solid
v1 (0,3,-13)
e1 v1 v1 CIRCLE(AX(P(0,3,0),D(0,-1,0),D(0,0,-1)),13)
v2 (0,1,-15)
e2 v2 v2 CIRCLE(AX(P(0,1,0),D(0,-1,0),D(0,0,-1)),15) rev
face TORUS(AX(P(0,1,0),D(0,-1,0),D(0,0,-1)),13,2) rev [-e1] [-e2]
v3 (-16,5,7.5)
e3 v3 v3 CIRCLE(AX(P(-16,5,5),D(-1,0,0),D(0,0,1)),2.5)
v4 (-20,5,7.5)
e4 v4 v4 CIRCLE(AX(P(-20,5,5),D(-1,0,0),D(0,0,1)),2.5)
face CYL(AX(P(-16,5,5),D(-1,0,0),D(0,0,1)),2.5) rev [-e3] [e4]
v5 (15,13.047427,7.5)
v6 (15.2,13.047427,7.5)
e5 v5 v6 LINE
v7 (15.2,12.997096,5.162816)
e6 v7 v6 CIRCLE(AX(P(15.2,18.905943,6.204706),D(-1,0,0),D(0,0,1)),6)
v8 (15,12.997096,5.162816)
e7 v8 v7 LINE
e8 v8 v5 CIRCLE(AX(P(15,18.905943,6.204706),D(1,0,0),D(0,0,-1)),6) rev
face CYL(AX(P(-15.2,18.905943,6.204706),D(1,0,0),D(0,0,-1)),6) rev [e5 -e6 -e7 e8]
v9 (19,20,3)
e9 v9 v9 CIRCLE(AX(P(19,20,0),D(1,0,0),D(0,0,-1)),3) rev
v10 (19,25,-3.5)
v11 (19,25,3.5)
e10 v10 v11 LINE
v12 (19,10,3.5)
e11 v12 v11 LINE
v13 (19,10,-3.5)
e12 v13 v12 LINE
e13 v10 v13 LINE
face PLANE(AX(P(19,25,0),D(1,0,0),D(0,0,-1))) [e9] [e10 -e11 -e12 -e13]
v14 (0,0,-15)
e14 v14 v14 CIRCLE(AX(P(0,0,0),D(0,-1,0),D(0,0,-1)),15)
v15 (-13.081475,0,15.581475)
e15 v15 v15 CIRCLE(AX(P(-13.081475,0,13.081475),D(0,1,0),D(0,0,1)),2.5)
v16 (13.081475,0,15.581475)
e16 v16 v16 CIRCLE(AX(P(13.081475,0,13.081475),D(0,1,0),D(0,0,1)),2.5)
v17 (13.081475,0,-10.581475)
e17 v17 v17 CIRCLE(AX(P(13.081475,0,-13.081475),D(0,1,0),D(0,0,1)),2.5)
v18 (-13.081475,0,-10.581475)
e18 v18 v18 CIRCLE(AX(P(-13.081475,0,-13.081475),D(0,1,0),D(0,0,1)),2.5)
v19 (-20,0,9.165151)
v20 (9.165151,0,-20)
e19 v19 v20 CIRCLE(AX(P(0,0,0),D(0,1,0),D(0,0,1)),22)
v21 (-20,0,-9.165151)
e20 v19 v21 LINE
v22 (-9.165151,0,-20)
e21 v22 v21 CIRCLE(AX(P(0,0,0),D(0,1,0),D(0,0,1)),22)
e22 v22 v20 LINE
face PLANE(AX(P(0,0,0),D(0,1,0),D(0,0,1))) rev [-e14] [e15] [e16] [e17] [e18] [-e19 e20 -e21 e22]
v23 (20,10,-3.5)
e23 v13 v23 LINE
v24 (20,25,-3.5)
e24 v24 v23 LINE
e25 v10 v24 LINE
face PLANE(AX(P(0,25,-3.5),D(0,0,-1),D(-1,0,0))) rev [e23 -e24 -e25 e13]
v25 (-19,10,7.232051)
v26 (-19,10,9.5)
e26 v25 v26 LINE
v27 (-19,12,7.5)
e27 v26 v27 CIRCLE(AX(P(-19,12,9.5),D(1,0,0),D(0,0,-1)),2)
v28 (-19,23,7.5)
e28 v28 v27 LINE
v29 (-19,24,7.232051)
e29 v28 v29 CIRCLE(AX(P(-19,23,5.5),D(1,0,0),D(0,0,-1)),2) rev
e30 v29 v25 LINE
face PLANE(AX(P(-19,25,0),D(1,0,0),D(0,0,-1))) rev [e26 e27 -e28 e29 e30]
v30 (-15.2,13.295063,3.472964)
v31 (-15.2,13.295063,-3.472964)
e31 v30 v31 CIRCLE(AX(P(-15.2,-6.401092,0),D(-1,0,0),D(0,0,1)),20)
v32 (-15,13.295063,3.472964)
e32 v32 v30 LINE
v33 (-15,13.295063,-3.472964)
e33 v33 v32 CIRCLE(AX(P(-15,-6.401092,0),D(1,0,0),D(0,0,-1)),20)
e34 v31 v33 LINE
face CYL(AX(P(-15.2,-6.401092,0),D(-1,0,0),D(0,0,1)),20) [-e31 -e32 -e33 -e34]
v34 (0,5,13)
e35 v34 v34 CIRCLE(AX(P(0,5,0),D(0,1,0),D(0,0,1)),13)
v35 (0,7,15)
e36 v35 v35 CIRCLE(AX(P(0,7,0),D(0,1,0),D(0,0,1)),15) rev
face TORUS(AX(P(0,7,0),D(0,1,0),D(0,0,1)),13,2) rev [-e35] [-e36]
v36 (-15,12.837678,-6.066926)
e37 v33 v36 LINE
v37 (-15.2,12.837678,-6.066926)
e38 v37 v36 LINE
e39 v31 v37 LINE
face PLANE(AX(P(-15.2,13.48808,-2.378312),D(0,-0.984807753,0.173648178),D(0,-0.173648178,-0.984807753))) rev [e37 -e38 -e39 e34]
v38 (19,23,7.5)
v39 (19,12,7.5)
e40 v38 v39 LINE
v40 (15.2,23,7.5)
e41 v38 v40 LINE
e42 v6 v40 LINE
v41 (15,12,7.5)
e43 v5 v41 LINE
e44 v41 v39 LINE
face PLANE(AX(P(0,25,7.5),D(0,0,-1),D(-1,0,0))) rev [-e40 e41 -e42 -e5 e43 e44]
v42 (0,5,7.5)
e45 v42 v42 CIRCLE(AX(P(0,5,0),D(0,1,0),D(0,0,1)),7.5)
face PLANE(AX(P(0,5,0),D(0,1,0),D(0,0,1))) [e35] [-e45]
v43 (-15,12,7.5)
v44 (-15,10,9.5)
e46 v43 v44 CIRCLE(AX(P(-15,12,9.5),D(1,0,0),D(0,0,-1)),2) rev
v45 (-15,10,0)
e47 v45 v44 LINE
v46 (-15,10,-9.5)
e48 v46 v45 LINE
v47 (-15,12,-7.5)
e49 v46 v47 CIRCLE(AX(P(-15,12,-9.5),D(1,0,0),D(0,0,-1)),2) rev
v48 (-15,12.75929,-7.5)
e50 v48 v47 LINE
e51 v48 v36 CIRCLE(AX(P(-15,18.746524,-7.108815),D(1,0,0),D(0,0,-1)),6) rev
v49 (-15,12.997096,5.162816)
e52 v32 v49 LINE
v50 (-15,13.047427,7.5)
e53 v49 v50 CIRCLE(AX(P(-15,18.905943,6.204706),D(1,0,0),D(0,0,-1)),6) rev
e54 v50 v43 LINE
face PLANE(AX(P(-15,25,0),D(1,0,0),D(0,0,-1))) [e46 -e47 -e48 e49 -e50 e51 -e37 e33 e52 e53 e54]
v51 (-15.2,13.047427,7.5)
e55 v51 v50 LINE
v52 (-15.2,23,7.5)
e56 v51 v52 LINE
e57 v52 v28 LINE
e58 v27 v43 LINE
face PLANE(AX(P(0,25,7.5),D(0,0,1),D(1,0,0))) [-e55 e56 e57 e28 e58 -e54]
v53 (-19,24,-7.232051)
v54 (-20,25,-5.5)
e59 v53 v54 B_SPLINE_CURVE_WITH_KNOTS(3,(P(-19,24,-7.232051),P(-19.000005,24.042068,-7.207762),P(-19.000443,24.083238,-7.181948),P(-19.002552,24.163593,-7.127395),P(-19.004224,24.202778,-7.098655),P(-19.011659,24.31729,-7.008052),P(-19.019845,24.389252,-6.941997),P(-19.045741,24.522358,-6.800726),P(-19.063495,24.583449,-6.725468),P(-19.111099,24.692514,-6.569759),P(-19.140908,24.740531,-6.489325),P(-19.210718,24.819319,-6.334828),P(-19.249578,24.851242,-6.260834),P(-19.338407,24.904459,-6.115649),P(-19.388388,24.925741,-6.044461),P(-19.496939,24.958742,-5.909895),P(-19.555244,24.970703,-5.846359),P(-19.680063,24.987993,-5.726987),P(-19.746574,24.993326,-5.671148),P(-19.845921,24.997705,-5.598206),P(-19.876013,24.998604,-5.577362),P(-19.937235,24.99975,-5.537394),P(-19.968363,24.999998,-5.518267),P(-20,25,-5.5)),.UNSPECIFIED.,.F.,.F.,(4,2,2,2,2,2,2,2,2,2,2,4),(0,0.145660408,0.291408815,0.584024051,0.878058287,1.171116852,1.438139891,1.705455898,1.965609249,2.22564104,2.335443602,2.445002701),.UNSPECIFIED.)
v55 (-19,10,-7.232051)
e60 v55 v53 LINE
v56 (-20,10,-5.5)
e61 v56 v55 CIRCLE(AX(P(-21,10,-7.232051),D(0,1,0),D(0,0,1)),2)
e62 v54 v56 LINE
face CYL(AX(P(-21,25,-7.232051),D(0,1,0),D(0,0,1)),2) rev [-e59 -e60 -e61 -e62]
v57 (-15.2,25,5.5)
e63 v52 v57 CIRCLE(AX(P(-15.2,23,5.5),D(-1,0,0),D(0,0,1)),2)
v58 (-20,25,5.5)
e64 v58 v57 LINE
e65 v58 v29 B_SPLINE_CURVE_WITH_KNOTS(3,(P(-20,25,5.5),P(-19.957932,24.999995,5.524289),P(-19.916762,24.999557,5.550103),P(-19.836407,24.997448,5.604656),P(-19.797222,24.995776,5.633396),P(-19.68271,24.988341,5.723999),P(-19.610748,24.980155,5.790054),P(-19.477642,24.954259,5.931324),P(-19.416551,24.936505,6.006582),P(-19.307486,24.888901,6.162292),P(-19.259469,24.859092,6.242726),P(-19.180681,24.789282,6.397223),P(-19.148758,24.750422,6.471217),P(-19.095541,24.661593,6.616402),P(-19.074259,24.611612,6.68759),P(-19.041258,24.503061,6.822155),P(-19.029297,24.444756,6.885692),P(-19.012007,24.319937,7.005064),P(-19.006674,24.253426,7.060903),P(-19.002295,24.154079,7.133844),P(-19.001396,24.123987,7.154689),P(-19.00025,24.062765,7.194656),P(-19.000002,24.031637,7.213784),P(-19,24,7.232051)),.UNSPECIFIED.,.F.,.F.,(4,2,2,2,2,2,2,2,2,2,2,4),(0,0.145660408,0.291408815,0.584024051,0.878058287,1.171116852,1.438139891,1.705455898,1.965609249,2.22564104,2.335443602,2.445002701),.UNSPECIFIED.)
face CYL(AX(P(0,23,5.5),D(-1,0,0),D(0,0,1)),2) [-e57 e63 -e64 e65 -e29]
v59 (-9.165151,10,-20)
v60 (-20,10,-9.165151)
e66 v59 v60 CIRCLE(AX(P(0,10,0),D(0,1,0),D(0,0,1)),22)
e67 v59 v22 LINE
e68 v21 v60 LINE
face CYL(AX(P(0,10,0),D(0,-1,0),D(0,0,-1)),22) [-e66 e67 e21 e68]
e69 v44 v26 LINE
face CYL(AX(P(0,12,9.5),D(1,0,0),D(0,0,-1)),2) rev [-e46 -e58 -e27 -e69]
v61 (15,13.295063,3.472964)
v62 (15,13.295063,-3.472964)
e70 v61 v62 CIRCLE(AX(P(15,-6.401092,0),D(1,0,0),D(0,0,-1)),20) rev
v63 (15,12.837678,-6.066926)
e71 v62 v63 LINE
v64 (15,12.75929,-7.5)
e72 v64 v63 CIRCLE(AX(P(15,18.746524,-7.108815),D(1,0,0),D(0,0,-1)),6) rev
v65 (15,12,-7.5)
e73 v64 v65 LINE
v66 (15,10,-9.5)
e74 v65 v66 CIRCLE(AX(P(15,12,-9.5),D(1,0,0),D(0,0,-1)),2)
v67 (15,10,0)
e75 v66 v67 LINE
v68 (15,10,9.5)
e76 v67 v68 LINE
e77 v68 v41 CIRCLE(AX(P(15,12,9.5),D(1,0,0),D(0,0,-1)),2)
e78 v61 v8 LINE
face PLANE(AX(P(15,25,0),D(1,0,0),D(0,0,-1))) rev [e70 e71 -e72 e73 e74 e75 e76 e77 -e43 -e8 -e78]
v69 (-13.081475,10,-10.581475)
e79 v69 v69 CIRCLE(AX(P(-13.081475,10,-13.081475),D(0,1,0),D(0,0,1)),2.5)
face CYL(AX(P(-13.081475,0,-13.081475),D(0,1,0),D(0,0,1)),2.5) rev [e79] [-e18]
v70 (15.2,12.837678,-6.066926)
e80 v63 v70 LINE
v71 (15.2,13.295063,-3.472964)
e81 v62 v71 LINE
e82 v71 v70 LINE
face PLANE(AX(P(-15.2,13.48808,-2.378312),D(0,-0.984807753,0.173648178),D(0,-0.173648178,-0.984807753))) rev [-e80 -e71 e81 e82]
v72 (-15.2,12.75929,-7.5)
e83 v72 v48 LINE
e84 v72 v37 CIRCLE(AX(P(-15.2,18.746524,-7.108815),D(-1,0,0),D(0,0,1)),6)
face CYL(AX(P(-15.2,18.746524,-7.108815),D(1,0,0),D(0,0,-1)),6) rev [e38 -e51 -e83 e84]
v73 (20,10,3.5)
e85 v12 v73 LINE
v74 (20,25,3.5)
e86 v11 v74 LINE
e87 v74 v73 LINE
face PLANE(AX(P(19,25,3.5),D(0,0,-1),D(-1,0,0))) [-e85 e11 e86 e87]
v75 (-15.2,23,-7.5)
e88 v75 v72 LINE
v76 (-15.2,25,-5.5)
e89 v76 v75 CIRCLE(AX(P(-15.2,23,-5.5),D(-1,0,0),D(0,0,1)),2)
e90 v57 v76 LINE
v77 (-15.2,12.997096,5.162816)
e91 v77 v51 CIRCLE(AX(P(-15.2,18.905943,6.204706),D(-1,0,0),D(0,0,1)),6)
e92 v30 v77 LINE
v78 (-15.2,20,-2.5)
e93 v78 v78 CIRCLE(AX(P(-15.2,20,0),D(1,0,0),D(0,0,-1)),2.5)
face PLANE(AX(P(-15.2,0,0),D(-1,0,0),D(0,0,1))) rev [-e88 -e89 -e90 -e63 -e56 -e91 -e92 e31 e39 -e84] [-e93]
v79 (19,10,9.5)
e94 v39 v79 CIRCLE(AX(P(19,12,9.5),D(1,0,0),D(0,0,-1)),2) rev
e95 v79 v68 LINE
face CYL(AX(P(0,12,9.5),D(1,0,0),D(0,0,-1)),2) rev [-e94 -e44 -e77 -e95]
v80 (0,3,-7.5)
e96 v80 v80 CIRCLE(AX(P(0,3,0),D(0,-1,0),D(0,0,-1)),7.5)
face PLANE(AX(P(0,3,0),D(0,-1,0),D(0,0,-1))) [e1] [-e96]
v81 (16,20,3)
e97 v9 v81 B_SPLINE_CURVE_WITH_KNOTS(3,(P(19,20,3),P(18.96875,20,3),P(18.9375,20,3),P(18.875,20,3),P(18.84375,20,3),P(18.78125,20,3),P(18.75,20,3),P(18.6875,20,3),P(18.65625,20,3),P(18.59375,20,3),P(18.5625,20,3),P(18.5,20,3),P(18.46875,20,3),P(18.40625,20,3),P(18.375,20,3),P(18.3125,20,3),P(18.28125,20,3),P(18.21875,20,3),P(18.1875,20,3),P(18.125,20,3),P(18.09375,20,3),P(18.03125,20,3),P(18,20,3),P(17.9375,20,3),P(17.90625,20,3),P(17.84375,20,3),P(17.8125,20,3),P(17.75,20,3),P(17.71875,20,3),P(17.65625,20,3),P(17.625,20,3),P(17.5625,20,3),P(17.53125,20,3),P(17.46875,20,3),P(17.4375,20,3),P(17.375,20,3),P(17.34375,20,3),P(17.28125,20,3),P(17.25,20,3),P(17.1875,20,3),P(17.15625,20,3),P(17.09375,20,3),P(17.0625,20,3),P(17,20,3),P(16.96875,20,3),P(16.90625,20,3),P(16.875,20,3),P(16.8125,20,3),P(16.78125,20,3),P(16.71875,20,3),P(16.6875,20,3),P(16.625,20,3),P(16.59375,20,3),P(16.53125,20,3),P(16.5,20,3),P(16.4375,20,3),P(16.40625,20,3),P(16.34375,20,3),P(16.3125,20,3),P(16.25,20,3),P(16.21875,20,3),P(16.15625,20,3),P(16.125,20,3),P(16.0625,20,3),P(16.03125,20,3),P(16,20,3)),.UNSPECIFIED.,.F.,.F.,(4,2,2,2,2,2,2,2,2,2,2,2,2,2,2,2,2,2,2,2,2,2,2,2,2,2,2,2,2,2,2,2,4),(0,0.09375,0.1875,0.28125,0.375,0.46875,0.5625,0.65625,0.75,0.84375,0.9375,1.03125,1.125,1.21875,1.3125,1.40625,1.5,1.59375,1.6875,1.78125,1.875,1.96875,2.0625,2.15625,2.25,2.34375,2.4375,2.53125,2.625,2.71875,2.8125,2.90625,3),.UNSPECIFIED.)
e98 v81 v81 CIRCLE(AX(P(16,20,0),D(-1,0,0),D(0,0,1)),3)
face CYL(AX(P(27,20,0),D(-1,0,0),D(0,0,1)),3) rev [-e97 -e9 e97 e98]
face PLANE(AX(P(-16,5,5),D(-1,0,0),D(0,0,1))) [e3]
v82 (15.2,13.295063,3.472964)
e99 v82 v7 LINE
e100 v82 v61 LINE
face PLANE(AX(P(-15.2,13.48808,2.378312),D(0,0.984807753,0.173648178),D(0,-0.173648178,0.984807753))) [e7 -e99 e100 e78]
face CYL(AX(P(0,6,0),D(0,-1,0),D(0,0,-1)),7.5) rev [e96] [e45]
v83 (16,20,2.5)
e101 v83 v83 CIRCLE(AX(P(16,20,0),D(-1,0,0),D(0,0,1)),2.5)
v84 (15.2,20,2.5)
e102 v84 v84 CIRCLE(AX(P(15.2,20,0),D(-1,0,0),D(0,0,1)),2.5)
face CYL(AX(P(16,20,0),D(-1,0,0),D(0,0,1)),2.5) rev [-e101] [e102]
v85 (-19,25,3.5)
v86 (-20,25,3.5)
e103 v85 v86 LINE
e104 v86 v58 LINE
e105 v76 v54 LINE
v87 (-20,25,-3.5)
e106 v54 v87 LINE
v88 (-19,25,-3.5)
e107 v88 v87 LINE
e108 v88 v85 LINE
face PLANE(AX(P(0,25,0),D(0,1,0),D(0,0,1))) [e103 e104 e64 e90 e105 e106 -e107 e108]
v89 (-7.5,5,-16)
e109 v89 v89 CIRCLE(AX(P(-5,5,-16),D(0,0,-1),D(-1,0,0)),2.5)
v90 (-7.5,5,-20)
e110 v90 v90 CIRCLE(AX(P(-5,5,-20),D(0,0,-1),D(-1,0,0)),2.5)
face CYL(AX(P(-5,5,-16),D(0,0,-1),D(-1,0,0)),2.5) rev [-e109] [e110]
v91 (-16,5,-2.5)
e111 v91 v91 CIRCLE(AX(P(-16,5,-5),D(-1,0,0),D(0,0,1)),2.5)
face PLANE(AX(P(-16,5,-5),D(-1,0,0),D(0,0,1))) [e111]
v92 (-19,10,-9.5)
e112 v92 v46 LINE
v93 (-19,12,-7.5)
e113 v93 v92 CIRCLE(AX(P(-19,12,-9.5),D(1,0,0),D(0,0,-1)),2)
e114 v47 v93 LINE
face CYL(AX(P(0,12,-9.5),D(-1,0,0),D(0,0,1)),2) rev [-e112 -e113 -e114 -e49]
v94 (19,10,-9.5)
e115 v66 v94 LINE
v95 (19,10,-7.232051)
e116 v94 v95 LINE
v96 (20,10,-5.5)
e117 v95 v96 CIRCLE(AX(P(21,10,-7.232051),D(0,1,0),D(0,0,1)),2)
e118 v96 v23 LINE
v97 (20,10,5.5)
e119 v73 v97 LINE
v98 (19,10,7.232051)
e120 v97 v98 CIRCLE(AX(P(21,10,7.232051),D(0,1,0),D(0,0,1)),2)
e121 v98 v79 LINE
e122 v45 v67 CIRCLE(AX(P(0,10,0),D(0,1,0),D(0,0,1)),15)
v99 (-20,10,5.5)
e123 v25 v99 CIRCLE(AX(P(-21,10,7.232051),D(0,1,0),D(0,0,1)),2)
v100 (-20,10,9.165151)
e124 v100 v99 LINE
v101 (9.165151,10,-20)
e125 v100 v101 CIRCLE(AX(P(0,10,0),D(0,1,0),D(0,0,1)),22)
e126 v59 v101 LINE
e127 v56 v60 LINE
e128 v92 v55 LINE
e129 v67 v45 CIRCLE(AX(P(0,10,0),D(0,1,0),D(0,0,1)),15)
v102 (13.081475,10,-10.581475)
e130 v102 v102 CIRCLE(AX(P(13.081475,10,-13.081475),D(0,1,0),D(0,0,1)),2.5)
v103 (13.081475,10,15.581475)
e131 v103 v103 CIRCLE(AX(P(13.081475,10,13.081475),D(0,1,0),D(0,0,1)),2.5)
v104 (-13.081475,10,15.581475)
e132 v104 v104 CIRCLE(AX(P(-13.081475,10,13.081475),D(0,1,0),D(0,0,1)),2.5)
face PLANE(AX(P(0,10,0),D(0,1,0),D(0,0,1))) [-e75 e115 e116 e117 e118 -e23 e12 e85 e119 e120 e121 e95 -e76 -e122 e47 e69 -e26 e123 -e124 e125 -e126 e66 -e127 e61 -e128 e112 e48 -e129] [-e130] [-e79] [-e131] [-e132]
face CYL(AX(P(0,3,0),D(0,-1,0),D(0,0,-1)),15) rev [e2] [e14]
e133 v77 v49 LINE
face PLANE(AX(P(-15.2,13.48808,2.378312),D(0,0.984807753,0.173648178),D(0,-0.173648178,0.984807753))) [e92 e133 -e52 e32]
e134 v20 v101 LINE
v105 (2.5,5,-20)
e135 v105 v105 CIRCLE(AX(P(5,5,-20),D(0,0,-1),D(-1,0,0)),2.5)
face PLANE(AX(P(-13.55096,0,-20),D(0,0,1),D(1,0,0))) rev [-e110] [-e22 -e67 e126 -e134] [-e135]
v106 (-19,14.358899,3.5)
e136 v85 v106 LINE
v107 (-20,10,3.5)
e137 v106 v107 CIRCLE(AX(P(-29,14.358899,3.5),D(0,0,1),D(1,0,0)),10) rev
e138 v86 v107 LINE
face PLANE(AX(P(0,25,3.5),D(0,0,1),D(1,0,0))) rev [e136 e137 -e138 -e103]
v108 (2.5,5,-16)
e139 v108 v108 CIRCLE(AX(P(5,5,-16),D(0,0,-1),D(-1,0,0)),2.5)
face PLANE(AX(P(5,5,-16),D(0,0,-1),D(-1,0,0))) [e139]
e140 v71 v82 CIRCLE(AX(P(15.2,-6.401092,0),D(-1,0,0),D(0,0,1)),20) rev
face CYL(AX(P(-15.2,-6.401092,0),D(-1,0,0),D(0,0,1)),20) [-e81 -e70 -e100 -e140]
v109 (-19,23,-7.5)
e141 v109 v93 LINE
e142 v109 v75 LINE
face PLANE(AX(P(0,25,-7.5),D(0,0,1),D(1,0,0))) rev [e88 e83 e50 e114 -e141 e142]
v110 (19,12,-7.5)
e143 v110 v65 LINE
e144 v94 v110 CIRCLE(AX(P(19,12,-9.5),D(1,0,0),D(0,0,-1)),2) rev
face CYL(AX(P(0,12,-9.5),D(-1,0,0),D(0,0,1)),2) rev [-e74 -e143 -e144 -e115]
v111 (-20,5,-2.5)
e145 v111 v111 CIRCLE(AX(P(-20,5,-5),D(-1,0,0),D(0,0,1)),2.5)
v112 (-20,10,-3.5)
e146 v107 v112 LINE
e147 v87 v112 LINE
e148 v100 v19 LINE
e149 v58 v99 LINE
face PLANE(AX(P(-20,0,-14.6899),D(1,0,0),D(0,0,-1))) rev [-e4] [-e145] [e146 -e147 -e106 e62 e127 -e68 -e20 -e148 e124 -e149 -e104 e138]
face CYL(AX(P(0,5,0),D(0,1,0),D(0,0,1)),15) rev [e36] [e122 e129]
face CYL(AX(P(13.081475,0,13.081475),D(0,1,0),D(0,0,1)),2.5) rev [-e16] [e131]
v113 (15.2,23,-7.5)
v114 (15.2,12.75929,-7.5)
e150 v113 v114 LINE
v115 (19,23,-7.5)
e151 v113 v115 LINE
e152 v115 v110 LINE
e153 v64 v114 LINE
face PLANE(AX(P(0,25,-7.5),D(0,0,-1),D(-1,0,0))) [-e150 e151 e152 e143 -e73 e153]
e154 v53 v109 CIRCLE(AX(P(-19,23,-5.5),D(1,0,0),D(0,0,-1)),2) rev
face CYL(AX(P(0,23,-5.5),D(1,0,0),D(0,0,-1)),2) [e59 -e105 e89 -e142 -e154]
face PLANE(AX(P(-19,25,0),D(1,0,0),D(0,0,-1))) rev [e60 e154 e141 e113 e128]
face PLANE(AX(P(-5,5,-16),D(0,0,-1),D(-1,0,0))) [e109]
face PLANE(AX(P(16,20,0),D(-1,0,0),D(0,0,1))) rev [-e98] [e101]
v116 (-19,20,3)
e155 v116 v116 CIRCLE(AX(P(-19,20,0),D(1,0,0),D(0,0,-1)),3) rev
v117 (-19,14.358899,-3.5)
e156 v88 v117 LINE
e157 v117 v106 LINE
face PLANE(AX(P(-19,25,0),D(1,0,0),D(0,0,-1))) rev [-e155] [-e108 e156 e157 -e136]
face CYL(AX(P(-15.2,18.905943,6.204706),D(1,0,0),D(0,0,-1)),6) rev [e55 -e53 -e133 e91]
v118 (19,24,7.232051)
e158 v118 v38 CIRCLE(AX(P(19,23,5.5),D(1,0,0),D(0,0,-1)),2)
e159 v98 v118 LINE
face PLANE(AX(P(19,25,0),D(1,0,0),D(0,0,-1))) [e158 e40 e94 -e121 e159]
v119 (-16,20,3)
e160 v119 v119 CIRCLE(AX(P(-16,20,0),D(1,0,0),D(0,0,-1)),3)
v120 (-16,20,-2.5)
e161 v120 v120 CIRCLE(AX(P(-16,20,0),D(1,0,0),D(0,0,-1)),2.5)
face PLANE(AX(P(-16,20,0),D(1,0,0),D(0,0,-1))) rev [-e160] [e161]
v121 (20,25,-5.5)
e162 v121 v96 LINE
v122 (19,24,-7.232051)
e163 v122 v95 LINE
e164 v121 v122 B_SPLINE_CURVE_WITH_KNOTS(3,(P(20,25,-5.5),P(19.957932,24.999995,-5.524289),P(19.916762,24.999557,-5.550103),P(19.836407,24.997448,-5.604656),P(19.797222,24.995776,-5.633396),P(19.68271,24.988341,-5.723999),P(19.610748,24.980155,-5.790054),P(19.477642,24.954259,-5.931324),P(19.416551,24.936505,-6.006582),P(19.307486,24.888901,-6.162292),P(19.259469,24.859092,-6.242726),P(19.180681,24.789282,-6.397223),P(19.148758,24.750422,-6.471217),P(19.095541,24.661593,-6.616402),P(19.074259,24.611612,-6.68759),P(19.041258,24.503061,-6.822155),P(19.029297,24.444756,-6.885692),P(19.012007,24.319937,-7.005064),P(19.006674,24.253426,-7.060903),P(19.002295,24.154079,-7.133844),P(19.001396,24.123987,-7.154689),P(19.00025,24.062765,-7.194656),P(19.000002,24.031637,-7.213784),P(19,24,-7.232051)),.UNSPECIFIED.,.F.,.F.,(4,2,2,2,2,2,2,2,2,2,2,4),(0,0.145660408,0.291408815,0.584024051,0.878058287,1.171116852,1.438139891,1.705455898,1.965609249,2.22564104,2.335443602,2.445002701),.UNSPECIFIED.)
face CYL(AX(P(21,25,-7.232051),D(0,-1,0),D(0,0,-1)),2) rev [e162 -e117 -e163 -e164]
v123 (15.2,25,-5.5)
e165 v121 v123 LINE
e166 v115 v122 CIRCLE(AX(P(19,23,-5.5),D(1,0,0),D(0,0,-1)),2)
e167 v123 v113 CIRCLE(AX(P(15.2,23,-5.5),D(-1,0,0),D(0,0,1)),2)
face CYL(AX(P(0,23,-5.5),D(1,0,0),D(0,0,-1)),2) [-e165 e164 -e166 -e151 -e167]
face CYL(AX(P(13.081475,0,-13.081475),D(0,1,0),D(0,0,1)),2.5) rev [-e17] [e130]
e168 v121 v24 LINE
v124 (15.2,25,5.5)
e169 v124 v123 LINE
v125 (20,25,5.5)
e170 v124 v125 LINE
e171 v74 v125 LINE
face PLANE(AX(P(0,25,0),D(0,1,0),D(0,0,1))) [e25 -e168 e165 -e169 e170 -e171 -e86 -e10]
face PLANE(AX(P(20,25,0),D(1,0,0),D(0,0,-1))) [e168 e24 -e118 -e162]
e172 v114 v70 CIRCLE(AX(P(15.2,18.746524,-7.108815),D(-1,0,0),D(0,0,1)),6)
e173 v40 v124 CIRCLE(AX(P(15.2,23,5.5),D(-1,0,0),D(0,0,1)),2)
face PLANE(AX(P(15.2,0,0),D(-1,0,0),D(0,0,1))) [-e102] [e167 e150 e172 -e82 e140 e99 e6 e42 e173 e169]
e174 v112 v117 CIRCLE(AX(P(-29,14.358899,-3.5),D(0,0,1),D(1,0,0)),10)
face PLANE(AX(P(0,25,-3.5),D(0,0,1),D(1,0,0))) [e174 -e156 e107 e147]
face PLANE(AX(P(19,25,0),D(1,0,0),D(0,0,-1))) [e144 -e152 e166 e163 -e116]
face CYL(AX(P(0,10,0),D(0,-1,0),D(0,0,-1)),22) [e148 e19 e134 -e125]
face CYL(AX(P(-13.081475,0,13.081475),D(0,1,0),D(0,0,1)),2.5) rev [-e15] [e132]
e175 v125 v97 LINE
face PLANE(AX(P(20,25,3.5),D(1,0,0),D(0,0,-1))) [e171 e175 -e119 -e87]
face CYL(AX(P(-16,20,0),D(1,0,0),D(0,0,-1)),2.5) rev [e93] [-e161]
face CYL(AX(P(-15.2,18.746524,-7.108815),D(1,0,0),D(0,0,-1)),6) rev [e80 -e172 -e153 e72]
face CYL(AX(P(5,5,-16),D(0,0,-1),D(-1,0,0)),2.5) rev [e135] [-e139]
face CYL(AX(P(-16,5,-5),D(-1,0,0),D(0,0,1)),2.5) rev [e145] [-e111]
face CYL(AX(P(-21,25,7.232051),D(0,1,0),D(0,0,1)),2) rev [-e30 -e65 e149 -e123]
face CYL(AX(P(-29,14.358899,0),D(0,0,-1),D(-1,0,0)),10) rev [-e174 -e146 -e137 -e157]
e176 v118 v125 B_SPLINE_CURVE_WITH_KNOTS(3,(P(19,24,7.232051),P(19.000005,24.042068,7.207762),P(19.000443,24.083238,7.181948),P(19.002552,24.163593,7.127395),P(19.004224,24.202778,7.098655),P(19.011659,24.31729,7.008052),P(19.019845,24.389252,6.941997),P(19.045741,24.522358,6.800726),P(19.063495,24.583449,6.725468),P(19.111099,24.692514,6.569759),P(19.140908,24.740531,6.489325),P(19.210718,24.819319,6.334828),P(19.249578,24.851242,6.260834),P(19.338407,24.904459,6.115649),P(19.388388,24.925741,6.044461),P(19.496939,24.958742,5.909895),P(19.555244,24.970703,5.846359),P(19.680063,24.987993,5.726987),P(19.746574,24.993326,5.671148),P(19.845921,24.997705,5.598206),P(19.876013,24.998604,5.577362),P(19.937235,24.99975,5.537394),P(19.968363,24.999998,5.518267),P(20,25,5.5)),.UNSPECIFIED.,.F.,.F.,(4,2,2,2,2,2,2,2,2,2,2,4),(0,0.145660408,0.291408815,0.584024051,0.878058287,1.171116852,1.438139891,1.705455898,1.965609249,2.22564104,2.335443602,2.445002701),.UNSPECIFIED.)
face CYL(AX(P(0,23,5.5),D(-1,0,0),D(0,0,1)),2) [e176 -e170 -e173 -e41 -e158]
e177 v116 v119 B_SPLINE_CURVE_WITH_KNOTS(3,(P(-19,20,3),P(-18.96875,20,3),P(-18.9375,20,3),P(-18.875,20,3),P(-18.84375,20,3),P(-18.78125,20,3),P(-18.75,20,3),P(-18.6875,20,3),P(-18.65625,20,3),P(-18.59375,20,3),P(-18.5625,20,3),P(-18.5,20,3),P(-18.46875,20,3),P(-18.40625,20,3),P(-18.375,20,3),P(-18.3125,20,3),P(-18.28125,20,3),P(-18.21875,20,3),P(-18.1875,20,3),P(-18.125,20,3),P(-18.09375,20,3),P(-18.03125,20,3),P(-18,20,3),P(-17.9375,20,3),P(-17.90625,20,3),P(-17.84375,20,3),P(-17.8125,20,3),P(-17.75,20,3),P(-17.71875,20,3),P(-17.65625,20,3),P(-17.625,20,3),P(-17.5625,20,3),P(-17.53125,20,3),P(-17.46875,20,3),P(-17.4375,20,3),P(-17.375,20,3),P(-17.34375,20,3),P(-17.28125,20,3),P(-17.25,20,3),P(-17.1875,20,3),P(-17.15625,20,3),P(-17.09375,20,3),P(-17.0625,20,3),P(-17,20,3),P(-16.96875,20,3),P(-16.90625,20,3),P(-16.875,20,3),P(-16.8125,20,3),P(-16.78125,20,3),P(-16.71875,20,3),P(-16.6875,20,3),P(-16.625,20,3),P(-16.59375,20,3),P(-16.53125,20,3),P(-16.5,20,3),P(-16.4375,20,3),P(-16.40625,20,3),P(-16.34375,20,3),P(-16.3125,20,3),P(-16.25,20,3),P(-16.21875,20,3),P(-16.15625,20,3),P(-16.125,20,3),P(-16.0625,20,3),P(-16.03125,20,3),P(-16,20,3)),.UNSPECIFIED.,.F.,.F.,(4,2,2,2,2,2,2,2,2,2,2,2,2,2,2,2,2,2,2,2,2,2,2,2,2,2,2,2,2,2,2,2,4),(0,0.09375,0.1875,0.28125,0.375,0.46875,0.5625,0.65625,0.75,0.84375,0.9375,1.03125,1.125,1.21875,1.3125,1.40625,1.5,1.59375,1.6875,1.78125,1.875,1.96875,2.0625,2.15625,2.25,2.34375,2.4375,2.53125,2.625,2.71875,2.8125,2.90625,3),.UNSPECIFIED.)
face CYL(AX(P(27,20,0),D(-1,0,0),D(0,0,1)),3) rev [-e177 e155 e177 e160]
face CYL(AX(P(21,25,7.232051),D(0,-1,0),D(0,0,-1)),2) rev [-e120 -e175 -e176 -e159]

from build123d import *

# Parameters (mm, degrees)
SKETCH1_R                = 22
BOSS_EXTRUDE1_DEPTH      = 10
SKETCH5_R                = 15
CUT_EXTRUDE3_DEPTH       = 5
CUT_EXTRUDE5_START       = -3
SKETCH7_R                = 15
CUT_EXTRUDE5_DEPTH       = 3
SKETCH8_R                = 7.5
CUT_EXTRUDE6_DEPTH       = 3
SKETCH6_R                = 2.5
CUT_EXTRUDE7_DEPTH       = 10
SKETCH9_W                = 6.833639819
SKETCH9_H                = 40.698121589
SKETCH9_W_2              = 26.089318242
SKETCH9_H_2              = 6.104718238
CUT_EXTRUDE8_DEPTH       = 10
BOSS_EXTRUDE3_DEPTH      = 15
FILLET1_R                = 2
FILLET2_R                = 10
CUT_EXTRUDE9_DEPTH       = 42
CUT_EXTRUDE9_DEPTH_BACK  = 15
SKETCH11_R               = 3
FILLET3_START            = 9
FILLET3_DEPTH            = 16
FILLET3_START_2          = -21
FILLET3_2_DEPTH          = 42
FILLET4_R                = 2
CUT_EXTRUDE18_DEPTH      = 30.2
CUT_EXTRUDE18_DEPTH_BACK = 0.2
FILLET5_R                = 20
SKETCH14_R               = 3
SKETCH14_R_2             = 2.5
BOSS_EXTRUDE4_DEPTH      = 0.8
BOSS_EXTRUDE5_START      = -0.8
SKETCH15_R               = 3
SKETCH15_R_2             = 2.5
BOSS_EXTRUDE5_DEPTH      = 0.8
SKETCH17_R               = 2.5
CUT_EXTRUDE20_DEPTH      = 4
SKETCH18_R               = 2.5
CUT_EXTRUDE21_DEPTH      = 4


with BuildPart() as part:
    # Sketch1 → Boss-Extrude1 (new body)
    with BuildSketch(Plane(origin=(0, 0, 0), x_dir=(1, 0, 0), z_dir=(0, 1, 0))):
        with Locations(Location((0, 0, 0), (0, 0, 270))):
            Circle(SKETCH1_R)
    extrude(amount=BOSS_EXTRUDE1_DEPTH)

    # Sketch5 → Cut-Extrude3 (cut)
    with BuildSketch(Plane(origin=(0, 10, 0), x_dir=(1, 0, 0), z_dir=(0, 1, 0))):
        with Locations(Location((0, 0, 0), (0, 0, 270))):
            Circle(SKETCH5_R)
    extrude(amount=-CUT_EXTRUDE3_DEPTH, mode=Mode.SUBTRACT)

    # Sketch7 → Cut-Extrude5 (cut)
    with BuildSketch(Plane(origin=(0, 0, 0), x_dir=(-1, 0, 0), z_dir=(0, -1, 0)).offset(CUT_EXTRUDE5_START)):
        with Locations(Location((0, 0, 0), (0, 0, 270))):
            Circle(SKETCH7_R)
    extrude(amount=CUT_EXTRUDE5_DEPTH, mode=Mode.SUBTRACT)

    # Sketch8 → Cut-Extrude6 (cut)
    with BuildSketch(Plane(origin=(0, 3, 0), x_dir=(-1, 0, 0), z_dir=(0, -1, 0))):
        with Locations(Location((0, 0, 0), (0, 0, 90))):
            Circle(SKETCH8_R)
    extrude(amount=-CUT_EXTRUDE6_DEPTH, mode=Mode.SUBTRACT)

    # Sketch6 → Cut-Extrude7 (cut)
    with BuildSketch(Plane(origin=(0, 10, 0), x_dir=(1, 0, 0), z_dir=(0, 1, 0))):
        with Locations(Location((13.081475452, 13.081475452, 0), (0, 0, 270))):
            Circle(SKETCH6_R)
        with Locations(Location((-13.081475452, -13.081475452, 0), (0, 0, 270))):
            Circle(SKETCH6_R)
        with Locations(Location((-13.081475452, 13.081475452, 0), (0, 0, 270))):
            Circle(SKETCH6_R)
        with Locations(Location((13.081475452, -13.081475452, 0), (0, 0, 270))):
            Circle(SKETCH6_R)
    extrude(amount=-CUT_EXTRUDE7_DEPTH, mode=Mode.SUBTRACT)

    # Sketch9 → Cut-Extrude8 (cut)
    with BuildSketch(Plane(origin=(0, 10, 0), x_dir=(1, 0, 0), z_dir=(0, 1, 0))):
        with Locations((-23.416819909, -5.65916064)):
            Rectangle(SKETCH9_W, SKETCH9_H)
        with Locations((-0.506301064, 23.052359119)):
            Rectangle(SKETCH9_W_2, SKETCH9_H_2)
    extrude(amount=-CUT_EXTRUDE8_DEPTH, mode=Mode.SUBTRACT)

    # Sketch10 → Boss-Extrude3 (add)
    with BuildSketch(Plane(origin=(0, 10, 0), x_dir=(1, 0, 0), z_dir=(0, 1, 0))):
        Polygon((-15, -7.5), (-15, 7.5), (-19, 7.5), (-19, 5.5), (-20, 5.5), (-20, 3.5), (-19, 3.5), (-19, -3.5), (-20, -3.5), (-20, -5.5), (-19, -5.5), (-19, -7.5), align=None)
        Polygon((20, -5.5), (20, -3.5), (19, -3.5), (19, 3.5), (20, 3.5), (20, 5.5), (19, 5.5), (19, 7.5), (15, 7.5), (15, -7.5), (19, -7.5), (19, -5.5), align=None)
    extrude(amount=BOSS_EXTRUDE3_DEPTH)

    # Fillet1
    fillet1_edges = [part.edges().sort_by_distance(p)[0] for p in [
        (-17, 10, -7.5),
        (-17, 25, -7.5),
        (-17, 10, 7.5),
        (-17, 25, 7.5),
        (17, 10, -7.5),
        (17, 10, 7.5),
        (17, 25, -7.5),
        (17, 25, 7.5),
    ]]
    fillet(fillet1_edges, radius=FILLET1_R)

    # Fillet2
    # the kernel refuses this fillet: 10 mm, written as the material it adds along each edge
    with BuildSketch(Plane(origin=(-19, 10, -14.397247359), x_dir=(0, 1, 0), z_dir=(0, 0, 1))) as fillet2_piece_1_section:
        with BuildLine():
            CenterArc((4.358898944, 10), FILLET2_R, 244.158067237, 25.841932763)
            Line((0, 1), (0, 0))
            Line((0, 0), (4.358898944, 0))
        make_face()
    fillet2_piece_1 = extrude(amount=28.794494718, mode=Mode.PRIVATE)
    fillet2_piece_1 = split(fillet2_piece_1, bisect_by=Plane(origin=(-19, 10, -5.5), z_dir=(0, 0, 1)), keep=Keep.TOP, mode=Mode.PRIVATE)
    fillet2_piece_1 = split(fillet2_piece_1, bisect_by=Plane(origin=(-19, 10, 5.5), z_dir=(0, 0, -1)), keep=Keep.TOP, mode=Mode.PRIVATE)
    add(fillet2_piece_1)

    # Sketch11 → Cut-Extrude9 (cut, two sides: drawn at the far end of the back side and taken through both)
    with BuildSketch(Plane(origin=(-15, 0, 0), x_dir=(0, 0, -1), z_dir=(1, 0, 0)).offset(-CUT_EXTRUDE9_DEPTH_BACK)):
        with Locations(Location((0, 20, 0), (0, 0, 180))):
            Circle(SKETCH11_R)
    extrude(amount=CUT_EXTRUDE9_DEPTH + CUT_EXTRUDE9_DEPTH_BACK, mode=Mode.SUBTRACT)

    # Fillet3: read off the stored shape, not the designer's step
    # Fillet3 outline → Fillet3 (add)
    with BuildSketch(Plane(origin=(0, 0, 0), x_dir=(1, 0, 0), z_dir=(0, 1, 0)).offset(FILLET3_START)):
        with BuildLine():
            Line((19, -5.5), (19, -7.232050808))
            ThreePointArc((19, -7.232050808), (19.267949192, -6.232050808), (20, -5.5))
            Line((20, -5.5), (19, -5.5))
        make_face()
        with BuildLine():
            Line((19, 5.5), (20, 5.5))
            ThreePointArc((20, 5.5), (19.267949192, 6.232050808), (19, 7.232050808))
            Line((19, 7.232050808), (19, 5.5))
        make_face()
        with BuildLine():
            ThreePointArc((-19, 7.232050808), (-19.267949192, 6.232050808), (-20, 5.5))
            Line((-20, 5.5), (-19, 5.5))
            Line((-19, 5.5), (-19, 7.232050808))
        make_face()
        with BuildLine():
            ThreePointArc((-20, -5.5), (-19.267949192, -6.232050808), (-19, -7.232050808))
            Line((-19, -7.232050808), (-19, -5.5))
            Line((-19, -5.5), (-20, -5.5))
        make_face()
    extrude(amount=FILLET3_DEPTH)

    # Fillet3 2 outline → Fillet3 2 (cut)
    with BuildSketch(Plane.YZ.offset(FILLET3_START_2)):
        with BuildLine():
            ThreePointArc((25, -5.5), (24.732050807, -6.5), (23.999999999, -7.232050808))
            Line((23.999999999, -7.232050808), (25, -7.232050808))
            Line((25, -7.232050808), (25, -5.5))
        make_face()
        with BuildLine():
            ThreePointArc((23.999999999, 7.232050808), (24.732050807, 6.5), (25, 5.5))
            Line((25, 5.5), (25, 7.232050808))
            Line((25, 7.232050808), (23.999999999, 7.232050808))
        make_face()
    extrude(amount=FILLET3_2_DEPTH, mode=Mode.SUBTRACT)

    # Fillet4
    fillet4_edges = [part.edges().sort_by_distance(p)[0] for p in [
        (0, 3, -15),
        (0, 5, -15),
    ]]
    fillet(fillet4_edges, radius=FILLET4_R)

    # Sketch13 → Cut-Extrude18 (cut, two sides: drawn at the far end of the back side and taken through both)
    with BuildSketch(Plane.ZY.offset(-15).offset(-CUT_EXTRUDE18_DEPTH_BACK)):
        with BuildLine():
            ThreePointArc((-1.041889066, 14.091153482), (-4.242640687, 15.757359313), (-5.908846518, 18.958110934))
            ThreePointArc((-5.908846518, 18.958110934), (-5.513931092, 22.365705796), (-3.31662479, 25))
            Line((-3.31662479, 25), (-5.5, 25))
            ThreePointArc((-5.5, 25), (-6.914213562, 24.414213562), (-7.5, 23))
            Line((-7.5, 23), (-7.5, 12.759289849))
            ThreePointArc((-7.5, 12.759289849), (-6.78111068, 12.755479981), (-6.066925886, 12.837677605))
            Line((-6.066925886, 12.837677605), (0, 13.907440329))
            Line((0, 13.907440329), (-1.041889066, 14.091153482))
        make_face()
        with BuildLine():
            ThreePointArc((2.954423259, 19.479055467), (0, 17), (-2.954423259, 19.479055467))
            Line((-2.954423259, 19.479055467), (-5.908846518, 18.958110934))
            ThreePointArc((-5.908846518, 18.958110934), (-4.242640687, 15.757359313), (-1.041889066, 14.091153482))
            Line((-1.041889066, 14.091153482), (0, 13.907440329))
            Line((0, 13.907440329), (1.041889066, 14.091153482))
            ThreePointArc((1.041889066, 14.091153482), (4.242640687, 15.757359313), (5.908846518, 18.958110934))
            Line((5.908846518, 18.958110934), (2.954423259, 19.479055467))
        make_face()
        with BuildLine():
            Line((-5.908846518, 18.958110934), (-2.954423259, 19.479055467))
            ThreePointArc((-2.954423259, 19.479055467), (-0.261467228, 22.988584094), (3, 20))
            ThreePointArc((3, 20), (2.988584094, 19.738532772), (2.954423259, 19.479055467))
            Line((2.954423259, 19.479055467), (5.908846518, 18.958110934))
            ThreePointArc((5.908846518, 18.958110934), (5.513931092, 22.365705796), (3.31662479, 25))
            Line((3.31662479, 25), (-3.31662479, 25))
            ThreePointArc((-3.31662479, 25), (-5.513931092, 22.365705796), (-5.908846518, 18.958110934))
        make_face()
        with BuildLine():
            Line((-2.954423259, 19.479055467), (0, 20))
            Line((0, 20), (2.954423259, 19.479055467))
            ThreePointArc((2.954423259, 19.479055467), (2.988584094, 19.738532772), (3, 20))
            ThreePointArc((3, 20), (-0.261467228, 22.988584094), (-2.954423259, 19.479055467))
        make_face()
        with BuildLine():
            Line((2.954423259, 19.479055467), (0, 20))
            Line((0, 20), (-2.954423259, 19.479055467))
            ThreePointArc((-2.954423259, 19.479055467), (0, 17), (2.954423259, 19.479055467))
        make_face()
        with BuildLine():
            ThreePointArc((3.31662479, 25), (5.513931092, 22.365705796), (5.908846518, 18.958110934))
            ThreePointArc((5.908846518, 18.958110934), (4.242640687, 15.757359313), (1.041889066, 14.091153482))
            Line((1.041889066, 14.091153482), (0, 13.907440329))
            Line((0, 13.907440329), (5.162816476, 12.997096488))
            ThreePointArc((5.162816476, 12.997096488), (6.333883164, 12.907333738), (7.5, 13.047426789))
            Line((7.5, 13.047426789), (7.5, 23))
            ThreePointArc((7.5, 23), (6.914213562, 24.414213562), (5.5, 25))
            Line((5.5, 25), (3.31662479, 25))
        make_face()
    extrude(amount=CUT_EXTRUDE18_DEPTH + CUT_EXTRUDE18_DEPTH_BACK, mode=Mode.SUBTRACT)

    # Fillet5
    fillet5_edges = [part.edges().sort_by_distance(p)[0] for p in [
        (15.1, 13.907440329, 0),
        (-15.1, 13.907440329, 0),
    ]]
    fillet(fillet5_edges, radius=FILLET5_R)

    # Sketch14 → Boss-Extrude4 (add)
    with BuildSketch(Plane.ZY.offset(-15.2)):
        with Locations((0, 20)):
            Circle(SKETCH14_R)
        with Locations((0, 20)):
            Circle(SKETCH14_R_2, mode=Mode.SUBTRACT)
    extrude(amount=-BOSS_EXTRUDE4_DEPTH)

    # Sketch15 → Boss-Extrude5 (add)
    with BuildSketch(Plane(origin=(-15.2, 0, 0), x_dir=(0, 0, -1), z_dir=(1, 0, 0)).offset(BOSS_EXTRUDE5_START)):
        with Locations(Location((0, 20, 0), (0, 0, 180))):
            Circle(SKETCH15_R)
        with Locations(Location((0, 20, 0), (0, 0, 180))):
            Circle(SKETCH15_R_2, mode=Mode.SUBTRACT)
    extrude(amount=BOSS_EXTRUDE5_DEPTH)

    # Sketch17 → Cut-Extrude20 (cut)
    with BuildSketch(Plane(origin=(0, 0, -20), x_dir=(-1, 0, 0), z_dir=(0, 0, -1))):
        with Locations((-5, 5)):
            Circle(SKETCH17_R)
        with Locations((5, 5)):
            Circle(SKETCH17_R)
    extrude(amount=-CUT_EXTRUDE20_DEPTH, mode=Mode.SUBTRACT)

    # Sketch18 → Cut-Extrude21 (cut)
    with BuildSketch(Plane.ZY.offset(20)):
        with Locations((-5, 5)):
            Circle(SKETCH18_R)
        with Locations((5, 5)):
            Circle(SKETCH18_R)
    extrude(amount=-CUT_EXTRUDE21_DEPTH, mode=Mode.SUBTRACT)


solid = part.part
